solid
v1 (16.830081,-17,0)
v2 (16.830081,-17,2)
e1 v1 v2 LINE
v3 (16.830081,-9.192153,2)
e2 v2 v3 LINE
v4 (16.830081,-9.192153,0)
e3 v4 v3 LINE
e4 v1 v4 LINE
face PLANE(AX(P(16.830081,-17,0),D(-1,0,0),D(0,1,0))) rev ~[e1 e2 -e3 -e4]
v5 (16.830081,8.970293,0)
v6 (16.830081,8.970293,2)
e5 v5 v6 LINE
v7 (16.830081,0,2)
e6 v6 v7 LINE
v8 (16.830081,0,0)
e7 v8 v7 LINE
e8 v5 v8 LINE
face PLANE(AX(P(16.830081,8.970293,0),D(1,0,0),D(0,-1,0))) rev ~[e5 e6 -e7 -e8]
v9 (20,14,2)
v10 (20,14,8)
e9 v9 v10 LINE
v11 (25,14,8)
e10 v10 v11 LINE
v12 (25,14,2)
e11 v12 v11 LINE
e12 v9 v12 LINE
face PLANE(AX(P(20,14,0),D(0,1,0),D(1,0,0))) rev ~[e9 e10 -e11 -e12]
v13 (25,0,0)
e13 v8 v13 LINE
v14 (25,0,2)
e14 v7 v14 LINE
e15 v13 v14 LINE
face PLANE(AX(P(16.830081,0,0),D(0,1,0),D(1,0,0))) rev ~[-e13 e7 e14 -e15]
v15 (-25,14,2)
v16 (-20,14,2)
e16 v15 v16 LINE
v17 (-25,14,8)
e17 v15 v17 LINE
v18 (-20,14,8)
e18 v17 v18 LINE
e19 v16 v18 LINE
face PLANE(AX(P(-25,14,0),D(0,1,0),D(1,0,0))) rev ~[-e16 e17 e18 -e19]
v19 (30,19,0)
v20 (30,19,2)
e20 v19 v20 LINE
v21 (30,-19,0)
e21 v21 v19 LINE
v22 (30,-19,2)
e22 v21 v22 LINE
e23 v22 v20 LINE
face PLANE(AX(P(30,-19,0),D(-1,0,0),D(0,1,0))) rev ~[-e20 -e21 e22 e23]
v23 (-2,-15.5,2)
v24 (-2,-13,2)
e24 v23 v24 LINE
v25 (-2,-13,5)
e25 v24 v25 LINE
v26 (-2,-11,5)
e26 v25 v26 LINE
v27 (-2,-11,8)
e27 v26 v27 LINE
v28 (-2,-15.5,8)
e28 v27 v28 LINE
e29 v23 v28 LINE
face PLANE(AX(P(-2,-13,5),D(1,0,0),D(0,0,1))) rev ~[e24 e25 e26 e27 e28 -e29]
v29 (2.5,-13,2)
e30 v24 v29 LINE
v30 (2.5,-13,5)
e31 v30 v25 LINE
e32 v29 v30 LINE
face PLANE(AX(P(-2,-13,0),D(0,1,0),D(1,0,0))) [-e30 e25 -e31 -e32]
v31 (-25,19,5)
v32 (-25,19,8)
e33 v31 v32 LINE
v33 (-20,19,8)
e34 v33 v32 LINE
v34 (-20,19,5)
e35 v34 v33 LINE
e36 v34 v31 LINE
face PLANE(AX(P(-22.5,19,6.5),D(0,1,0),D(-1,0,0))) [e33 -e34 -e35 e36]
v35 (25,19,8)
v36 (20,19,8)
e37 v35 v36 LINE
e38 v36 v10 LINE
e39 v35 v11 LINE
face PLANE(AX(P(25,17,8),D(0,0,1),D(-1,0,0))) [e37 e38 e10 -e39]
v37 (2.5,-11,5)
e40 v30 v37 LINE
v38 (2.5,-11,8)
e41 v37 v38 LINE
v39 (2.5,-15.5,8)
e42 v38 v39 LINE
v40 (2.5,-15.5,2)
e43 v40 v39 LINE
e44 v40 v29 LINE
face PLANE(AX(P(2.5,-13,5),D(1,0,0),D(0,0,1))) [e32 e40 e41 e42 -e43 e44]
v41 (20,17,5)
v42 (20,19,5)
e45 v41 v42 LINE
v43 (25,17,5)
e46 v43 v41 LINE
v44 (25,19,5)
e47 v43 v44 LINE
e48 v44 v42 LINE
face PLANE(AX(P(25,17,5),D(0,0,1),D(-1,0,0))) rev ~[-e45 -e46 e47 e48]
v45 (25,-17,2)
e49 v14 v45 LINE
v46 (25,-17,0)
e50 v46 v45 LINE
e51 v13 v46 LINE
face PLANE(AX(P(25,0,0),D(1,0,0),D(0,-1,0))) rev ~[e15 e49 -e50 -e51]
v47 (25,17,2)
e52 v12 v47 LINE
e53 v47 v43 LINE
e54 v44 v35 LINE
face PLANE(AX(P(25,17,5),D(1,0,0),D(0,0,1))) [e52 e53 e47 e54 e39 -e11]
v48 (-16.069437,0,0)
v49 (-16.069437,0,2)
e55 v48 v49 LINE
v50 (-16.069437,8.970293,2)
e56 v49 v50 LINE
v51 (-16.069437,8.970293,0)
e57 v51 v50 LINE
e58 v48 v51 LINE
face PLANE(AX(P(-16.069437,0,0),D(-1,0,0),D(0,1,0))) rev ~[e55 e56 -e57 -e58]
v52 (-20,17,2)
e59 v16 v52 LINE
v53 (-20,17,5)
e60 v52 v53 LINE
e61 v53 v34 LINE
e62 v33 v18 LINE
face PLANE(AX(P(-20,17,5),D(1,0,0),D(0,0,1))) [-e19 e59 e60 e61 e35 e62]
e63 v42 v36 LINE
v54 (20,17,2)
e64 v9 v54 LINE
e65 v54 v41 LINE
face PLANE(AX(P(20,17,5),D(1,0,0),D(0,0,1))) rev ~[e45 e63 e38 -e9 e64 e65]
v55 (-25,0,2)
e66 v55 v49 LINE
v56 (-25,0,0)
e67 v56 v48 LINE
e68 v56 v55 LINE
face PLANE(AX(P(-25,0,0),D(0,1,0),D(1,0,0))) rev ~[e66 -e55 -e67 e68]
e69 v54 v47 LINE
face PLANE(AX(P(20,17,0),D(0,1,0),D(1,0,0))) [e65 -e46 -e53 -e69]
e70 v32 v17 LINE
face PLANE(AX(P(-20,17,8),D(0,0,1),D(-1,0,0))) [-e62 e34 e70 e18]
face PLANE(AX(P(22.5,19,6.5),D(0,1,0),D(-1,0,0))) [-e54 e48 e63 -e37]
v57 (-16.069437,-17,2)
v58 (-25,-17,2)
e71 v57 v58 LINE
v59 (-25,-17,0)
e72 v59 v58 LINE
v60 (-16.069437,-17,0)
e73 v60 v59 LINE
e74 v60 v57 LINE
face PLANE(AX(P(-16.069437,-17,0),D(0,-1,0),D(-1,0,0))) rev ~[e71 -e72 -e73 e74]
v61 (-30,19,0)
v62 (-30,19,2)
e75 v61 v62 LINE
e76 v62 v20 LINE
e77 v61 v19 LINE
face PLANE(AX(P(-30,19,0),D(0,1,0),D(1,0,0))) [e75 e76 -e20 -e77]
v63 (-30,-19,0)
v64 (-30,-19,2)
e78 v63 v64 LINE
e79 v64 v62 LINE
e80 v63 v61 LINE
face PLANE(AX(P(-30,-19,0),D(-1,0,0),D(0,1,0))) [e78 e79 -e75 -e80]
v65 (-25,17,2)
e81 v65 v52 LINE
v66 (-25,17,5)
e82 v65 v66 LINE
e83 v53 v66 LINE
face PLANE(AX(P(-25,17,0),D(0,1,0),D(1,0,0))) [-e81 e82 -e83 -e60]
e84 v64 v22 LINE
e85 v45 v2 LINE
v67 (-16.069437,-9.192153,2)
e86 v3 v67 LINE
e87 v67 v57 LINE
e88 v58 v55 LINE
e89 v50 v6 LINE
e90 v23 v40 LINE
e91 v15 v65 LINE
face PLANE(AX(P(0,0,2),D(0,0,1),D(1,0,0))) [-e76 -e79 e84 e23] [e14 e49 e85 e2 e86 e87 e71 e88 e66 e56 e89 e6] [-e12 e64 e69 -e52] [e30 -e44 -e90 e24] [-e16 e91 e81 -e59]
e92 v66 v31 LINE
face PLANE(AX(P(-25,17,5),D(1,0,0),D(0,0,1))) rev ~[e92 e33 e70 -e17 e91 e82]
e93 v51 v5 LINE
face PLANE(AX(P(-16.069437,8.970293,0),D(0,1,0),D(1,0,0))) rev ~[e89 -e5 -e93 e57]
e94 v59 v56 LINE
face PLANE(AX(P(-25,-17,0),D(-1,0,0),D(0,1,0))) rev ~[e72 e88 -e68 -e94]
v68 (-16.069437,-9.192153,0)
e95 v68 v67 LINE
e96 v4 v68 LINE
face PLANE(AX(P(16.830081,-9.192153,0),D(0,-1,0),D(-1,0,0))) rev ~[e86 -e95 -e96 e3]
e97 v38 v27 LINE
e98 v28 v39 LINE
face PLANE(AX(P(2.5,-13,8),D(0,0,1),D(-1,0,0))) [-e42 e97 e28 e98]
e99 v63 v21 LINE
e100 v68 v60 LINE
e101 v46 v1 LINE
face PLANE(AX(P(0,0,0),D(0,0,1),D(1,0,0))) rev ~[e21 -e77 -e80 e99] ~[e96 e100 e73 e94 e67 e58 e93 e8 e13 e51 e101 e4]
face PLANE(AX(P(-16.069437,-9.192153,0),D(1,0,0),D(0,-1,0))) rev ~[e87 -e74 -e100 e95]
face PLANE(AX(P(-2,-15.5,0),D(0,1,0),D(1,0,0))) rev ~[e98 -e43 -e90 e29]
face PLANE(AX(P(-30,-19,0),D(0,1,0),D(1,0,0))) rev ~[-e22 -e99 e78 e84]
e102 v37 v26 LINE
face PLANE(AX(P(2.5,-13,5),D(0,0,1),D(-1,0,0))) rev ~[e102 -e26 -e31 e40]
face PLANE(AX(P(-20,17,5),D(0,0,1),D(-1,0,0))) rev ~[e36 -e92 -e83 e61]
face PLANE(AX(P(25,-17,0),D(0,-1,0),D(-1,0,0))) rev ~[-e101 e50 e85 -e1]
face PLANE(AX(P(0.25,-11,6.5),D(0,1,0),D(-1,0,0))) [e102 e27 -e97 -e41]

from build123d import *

# Parameters (mm, degrees)
F0_W     = 60
F0_H     = 38
F0_W_2   = 4.5
F0_H_2   = 2.5
F0_W_3   = 5
F0_H_3   = 3
F1_DEPTH = 2
F2_DEPTH = 8
F3_W     = 5
F3_H     = 3
F4_DEPTH = 2
F5_W     = 5
F5_H     = 3
F6_DEPTH = 2
F7_DEPTH = 8
F8_W     = 4.5
F8_H     = 3
F9_DEPTH = 2


# Not quite as in the source:
# - a feature names something its author has since deleted; it is built from what else it names


with BuildPart() as f1:
    # F0 (on Top) → F1 (new body)
    with BuildSketch(Plane.XY):
        Rectangle(F0_W, F0_H)
        with Locations((0.25, -14.25)):
            Rectangle(F0_W_2, F0_H_2, mode=Mode.SUBTRACT)
        Polygon((-16.0694369525, 0), (-16.0694369525, 8.9702934623), (16.8300806135, 8.9702934623), (16.8300806135, 0), (25, 0), (25, -17), (16.8300806135, -17), (16.8300806135, -9.1921526343), (-16.0694369525, -9.1921526343), (-16.0694369525, -17), (-25, -17), (-25, 0), align=None, mode=Mode.SUBTRACT)
        with Locations((-22.5, 15.5)):
            Rectangle(F0_W_3, F0_H_3, mode=Mode.SUBTRACT)
        with Locations((22.5, 15.5)):
            Rectangle(F0_W_3, F0_H_3, mode=Mode.SUBTRACT)
    extrude(amount=F1_DEPTH)

    # F0 (on Top) → F2 (join)
    with BuildSketch(Plane.XY):
        with Locations((22.5, 15.5)):
            Rectangle(F0_W_3, F0_H_3)
        with Locations((-22.5, 15.5)):
            Rectangle(F0_W_3, F0_H_3)
    extrude(amount=F2_DEPTH)

    # F3 (on face) → F4 (join)
    with BuildSketch(Plane(origin=(0, 17, 0), x_dir=(-1, 0, 0), z_dir=(0, 1, 0))):
        with Locations((22.5, 6.5)):
            Rectangle(F3_W, F3_H)
    extrude(amount=F4_DEPTH)

    # F5 (on face) → F6 (join)
    with BuildSketch(Plane(origin=(0, 17, 0), x_dir=(-1, 0, 0), z_dir=(0, 1, 0))):
        with Locations((-22.5, 6.5)):
            Rectangle(F5_W, F5_H)
    extrude(amount=F6_DEPTH)

    # F0 (on Top) → F7 (join)
    with BuildSketch(Plane.XY):
        with Locations((0.25, -14.25)):
            Rectangle(F0_W_2, F0_H_2)
    extrude(amount=F7_DEPTH)

    # F8 (on face) → F9 (join)
    with BuildSketch(Plane(origin=(0, -13, 0), x_dir=(-1, 0, 0), z_dir=(0, 1, 0))):
        with Locations((-0.25, 6.5)):
            Rectangle(F8_W, F8_H)
    extrude(amount=F9_DEPTH)


solid = f1.part
